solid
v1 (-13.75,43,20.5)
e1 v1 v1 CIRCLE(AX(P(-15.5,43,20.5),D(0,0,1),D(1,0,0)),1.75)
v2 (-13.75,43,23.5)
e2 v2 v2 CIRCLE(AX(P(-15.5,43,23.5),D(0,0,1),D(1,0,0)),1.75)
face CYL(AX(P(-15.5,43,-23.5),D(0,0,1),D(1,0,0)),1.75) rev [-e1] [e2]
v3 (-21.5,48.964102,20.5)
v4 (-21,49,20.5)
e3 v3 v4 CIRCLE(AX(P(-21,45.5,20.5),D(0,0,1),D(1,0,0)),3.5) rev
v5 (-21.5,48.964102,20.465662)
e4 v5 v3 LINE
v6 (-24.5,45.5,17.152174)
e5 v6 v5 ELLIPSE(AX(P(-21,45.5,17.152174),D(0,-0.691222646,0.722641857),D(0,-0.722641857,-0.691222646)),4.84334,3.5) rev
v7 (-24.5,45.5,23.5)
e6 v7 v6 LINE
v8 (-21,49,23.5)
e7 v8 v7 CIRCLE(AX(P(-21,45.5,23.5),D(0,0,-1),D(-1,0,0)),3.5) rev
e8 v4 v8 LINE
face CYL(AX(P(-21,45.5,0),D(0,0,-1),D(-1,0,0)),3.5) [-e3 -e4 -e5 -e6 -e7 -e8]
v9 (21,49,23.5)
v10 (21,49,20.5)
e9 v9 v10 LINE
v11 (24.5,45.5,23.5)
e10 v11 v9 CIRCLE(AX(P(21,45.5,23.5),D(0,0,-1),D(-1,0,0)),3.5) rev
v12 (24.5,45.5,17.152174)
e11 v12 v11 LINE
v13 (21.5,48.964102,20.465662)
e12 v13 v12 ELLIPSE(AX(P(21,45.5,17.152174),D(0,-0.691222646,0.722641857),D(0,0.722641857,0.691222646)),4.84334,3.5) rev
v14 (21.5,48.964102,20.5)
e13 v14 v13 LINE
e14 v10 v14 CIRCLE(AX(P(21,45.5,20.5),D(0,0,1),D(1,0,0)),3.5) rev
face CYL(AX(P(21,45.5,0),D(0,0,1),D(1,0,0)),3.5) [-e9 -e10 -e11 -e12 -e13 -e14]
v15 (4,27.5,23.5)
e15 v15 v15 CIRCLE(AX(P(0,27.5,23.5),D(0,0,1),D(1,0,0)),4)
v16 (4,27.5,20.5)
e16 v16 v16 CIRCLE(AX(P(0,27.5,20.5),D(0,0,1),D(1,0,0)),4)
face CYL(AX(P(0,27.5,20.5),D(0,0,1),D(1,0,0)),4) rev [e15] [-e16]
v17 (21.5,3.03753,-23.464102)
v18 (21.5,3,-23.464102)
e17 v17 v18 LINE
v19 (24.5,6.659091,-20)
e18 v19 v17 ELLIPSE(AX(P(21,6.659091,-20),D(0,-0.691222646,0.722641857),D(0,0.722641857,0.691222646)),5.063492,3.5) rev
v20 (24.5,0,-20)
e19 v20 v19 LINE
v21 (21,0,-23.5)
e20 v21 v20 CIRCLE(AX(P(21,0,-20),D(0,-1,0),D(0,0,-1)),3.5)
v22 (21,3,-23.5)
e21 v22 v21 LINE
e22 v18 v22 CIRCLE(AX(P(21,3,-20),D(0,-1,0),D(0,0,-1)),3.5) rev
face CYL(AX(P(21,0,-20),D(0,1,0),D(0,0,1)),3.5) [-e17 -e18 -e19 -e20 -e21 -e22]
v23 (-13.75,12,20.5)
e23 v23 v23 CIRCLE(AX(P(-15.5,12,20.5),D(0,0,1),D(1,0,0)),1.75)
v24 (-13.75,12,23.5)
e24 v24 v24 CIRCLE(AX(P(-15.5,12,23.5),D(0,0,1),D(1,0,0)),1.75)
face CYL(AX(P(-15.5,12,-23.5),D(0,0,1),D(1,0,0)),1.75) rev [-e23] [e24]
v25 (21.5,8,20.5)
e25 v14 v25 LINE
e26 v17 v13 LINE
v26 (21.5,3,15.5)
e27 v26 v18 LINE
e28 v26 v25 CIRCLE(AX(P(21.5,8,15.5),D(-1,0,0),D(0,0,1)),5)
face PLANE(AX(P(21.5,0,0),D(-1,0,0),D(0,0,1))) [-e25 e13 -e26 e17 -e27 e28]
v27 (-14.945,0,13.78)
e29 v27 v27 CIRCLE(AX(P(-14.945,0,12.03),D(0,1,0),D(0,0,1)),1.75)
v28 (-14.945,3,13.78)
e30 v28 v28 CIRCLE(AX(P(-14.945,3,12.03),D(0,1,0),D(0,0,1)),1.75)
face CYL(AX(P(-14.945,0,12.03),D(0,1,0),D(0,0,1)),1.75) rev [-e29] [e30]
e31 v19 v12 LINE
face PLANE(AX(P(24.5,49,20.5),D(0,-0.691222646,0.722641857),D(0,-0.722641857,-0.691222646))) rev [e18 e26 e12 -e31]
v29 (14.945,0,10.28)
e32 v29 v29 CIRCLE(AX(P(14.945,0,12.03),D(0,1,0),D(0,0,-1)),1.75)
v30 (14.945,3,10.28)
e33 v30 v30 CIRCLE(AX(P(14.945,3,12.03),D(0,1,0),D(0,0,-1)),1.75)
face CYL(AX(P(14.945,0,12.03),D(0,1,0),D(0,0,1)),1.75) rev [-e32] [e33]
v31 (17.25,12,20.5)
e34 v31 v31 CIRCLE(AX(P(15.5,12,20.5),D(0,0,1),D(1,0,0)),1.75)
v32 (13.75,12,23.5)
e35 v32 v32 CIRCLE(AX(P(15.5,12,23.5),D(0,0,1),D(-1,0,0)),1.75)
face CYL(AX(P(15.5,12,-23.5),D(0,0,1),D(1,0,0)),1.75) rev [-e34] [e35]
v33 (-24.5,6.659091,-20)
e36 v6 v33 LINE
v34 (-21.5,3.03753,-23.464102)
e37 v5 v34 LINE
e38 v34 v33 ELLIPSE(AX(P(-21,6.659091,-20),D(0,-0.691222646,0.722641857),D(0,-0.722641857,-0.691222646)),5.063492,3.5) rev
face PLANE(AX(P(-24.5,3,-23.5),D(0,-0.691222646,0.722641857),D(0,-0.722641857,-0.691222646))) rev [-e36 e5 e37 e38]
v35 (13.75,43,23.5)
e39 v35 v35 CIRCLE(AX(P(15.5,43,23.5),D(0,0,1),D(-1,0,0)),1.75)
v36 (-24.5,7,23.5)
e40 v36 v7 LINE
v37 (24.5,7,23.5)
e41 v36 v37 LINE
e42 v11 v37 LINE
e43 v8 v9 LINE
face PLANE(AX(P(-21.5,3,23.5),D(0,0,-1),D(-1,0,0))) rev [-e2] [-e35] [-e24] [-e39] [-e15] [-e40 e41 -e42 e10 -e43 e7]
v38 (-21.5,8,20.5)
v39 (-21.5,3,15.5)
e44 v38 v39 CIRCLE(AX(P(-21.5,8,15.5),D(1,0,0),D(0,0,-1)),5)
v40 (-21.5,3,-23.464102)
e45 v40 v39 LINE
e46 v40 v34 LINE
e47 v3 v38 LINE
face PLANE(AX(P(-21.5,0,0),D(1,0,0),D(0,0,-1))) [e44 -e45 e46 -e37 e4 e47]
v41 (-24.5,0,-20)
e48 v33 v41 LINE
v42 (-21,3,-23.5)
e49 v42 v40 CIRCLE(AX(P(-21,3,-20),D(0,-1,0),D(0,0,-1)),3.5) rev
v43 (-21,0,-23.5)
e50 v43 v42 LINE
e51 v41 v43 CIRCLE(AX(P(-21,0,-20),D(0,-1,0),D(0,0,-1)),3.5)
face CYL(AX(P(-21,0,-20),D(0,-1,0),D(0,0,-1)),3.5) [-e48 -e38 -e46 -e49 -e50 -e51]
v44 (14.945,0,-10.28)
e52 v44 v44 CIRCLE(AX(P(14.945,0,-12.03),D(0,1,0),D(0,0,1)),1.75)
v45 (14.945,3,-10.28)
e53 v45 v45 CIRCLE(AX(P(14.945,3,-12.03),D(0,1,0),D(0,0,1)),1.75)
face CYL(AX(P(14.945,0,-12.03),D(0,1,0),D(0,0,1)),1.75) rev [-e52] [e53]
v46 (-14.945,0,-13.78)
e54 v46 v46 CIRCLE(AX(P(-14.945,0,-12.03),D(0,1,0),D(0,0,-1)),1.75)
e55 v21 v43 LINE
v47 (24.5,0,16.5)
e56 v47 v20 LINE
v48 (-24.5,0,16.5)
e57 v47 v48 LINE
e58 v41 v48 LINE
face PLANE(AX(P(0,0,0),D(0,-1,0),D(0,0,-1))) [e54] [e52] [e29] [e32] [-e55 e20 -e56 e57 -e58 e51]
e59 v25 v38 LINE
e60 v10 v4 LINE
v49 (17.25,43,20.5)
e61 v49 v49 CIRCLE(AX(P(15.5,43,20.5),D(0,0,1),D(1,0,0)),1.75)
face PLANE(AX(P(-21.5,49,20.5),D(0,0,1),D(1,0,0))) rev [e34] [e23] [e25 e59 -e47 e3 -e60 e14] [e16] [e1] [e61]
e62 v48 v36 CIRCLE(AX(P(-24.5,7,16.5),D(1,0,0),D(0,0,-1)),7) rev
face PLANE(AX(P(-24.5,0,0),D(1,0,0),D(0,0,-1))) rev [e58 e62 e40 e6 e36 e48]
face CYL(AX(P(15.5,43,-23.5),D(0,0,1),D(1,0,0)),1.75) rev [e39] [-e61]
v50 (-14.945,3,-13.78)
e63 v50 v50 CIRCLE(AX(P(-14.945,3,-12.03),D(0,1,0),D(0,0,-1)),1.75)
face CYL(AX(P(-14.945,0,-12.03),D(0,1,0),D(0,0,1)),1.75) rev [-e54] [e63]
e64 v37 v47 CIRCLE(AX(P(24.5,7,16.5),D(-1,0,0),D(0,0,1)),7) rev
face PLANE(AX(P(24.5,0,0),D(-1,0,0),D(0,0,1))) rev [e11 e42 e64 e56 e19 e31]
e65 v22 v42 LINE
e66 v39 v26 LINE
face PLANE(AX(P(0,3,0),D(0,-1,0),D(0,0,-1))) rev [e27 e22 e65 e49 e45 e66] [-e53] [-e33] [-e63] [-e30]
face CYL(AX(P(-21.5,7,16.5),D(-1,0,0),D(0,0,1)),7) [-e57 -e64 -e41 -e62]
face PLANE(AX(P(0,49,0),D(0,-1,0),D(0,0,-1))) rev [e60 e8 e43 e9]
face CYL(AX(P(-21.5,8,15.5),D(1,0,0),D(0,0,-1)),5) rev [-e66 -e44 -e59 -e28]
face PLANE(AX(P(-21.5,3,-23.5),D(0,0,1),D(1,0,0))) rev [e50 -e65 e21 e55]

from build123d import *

# Parameters (mm, degrees)
ESBO_O1_W                = 43
ESBO_O1_H                = 47
RESSALTO_EXTRUS_O1_DEPTH = 3
ESBO_O2_W                = 43
ESBO_O2_H                = 3
RESSALTO_EXTRUS_O2_DEPTH = 46
ESBO_O3_R                = 1.75
CORTE_EXTRUS_O1_DEPTH    = 56.950871307
ESBO_O4_R                = 1.75
CORTE_EXTRUS_O2_DEPTH    = 72.219730412
RESSALTO_EXTRUS_O3_DEPTH = 3
RESSALTO_EXTRUS_O4_DEPTH = 3
ESBO_O7_R                = 4
CORTE_EXTRUS_O3_DEPTH    = 3
FILETE1_R                = 3.5
FILETE2_R                = 7
FILETE3_R                = 3.5
FILETE4_R                = 5


with BuildPart() as part:
    # Esboço1 → Ressalto-extrusão1 (new body)
    with BuildSketch(Plane(origin=(0, 0, 0), x_dir=(1, 0, 0), z_dir=(0, 1, 0))):
        Rectangle(ESBO_O1_W, ESBO_O1_H)
    extrude(amount=RESSALTO_EXTRUS_O1_DEPTH)

    # Esboço2 → Ressalto-extrusão2 (add)
    with BuildSketch(Plane(origin=(0, 3, 0), x_dir=(1, 0, 0), z_dir=(0, 1, 0))):
        with Locations((0, -22)):
            Rectangle(ESBO_O2_W, ESBO_O2_H)
    extrude(amount=RESSALTO_EXTRUS_O2_DEPTH)

    # Esboço3 → Corte-extrusão1 (cut, through all)
    with BuildSketch(Plane(origin=(0, 3, 0), x_dir=(1, 0, 0), z_dir=(0, 1, 0))):
        with Locations(Location((14.945, 12.03, 0), (0, 0, 270))):
            Circle(ESBO_O3_R)
        with Locations(Location((14.945, -12.03, 0), (0, 0, 90))):
            Circle(ESBO_O3_R)
        with Locations(Location((-14.945, -12.03, 0), (0, 0, 270))):
            Circle(ESBO_O3_R)
        with Locations(Location((-14.945, 12.03, 0), (0, 0, 90))):
            Circle(ESBO_O3_R)
    extrude(amount=-CORTE_EXTRUS_O1_DEPTH, mode=Mode.SUBTRACT)

    # Esboço4 → Corte-extrusão2 (cut, through all)
    with BuildSketch(Plane.XY.offset(23.5)):
        with Locations((-15.5, 43)):
            Circle(ESBO_O4_R)
        with Locations((15.5, 43)):
            Circle(ESBO_O4_R)
        with Locations((-15.5, 12)):
            Circle(ESBO_O4_R)
        with Locations((15.5, 12)):
            Circle(ESBO_O4_R)
    extrude(amount=-CORTE_EXTRUS_O2_DEPTH, mode=Mode.SUBTRACT)

    # Esboço5 → Ressalto-extrusão3 (add)
    with BuildSketch(Plane.ZY.offset(21.5)):
        Polygon((-23.5, 0), (-23.5, 3), (20.5, 49), (23.5, 49), (23.5, 0), align=None)
    extrude(amount=RESSALTO_EXTRUS_O3_DEPTH)

    # Esboço6 → Ressalto-extrusão4 (add)
    with BuildSketch(Plane(origin=(21.5, 0, 0), x_dir=(0, 0, -1), z_dir=(1, 0, 0))):
        Polygon((23.5, 0), (-23.5, 0), (-23.5, 49), (-20.5, 49), (23.5, 3), align=None)
    extrude(amount=RESSALTO_EXTRUS_O4_DEPTH)

    # Esboço7 → Corte-extrusão3 (cut)
    with BuildSketch(Plane.XY.offset(23.5)):
        with Locations((0, 27.5)):
            Circle(ESBO_O7_R)
    extrude(amount=-CORTE_EXTRUS_O3_DEPTH, mode=Mode.SUBTRACT)

    # Filete1
    # the kernel refuses this fillet: 3.5 mm, written as the material it takes off along each edge
    with BuildSketch(Plane(origin=(-24.5, 49, 11.75), x_dir=(1, 0, 0), z_dir=(0, 0, 1)), Plane(origin=(24.5, 49, 32.25), x_dir=(-1, 0, 0), z_dir=(0, 0, -1))) as filete1_piece_1:
        with BuildLine():
            CenterArc((FILETE1_R, -FILETE1_R), FILETE1_R, 90, 90)
            Line((0, -FILETE1_R), (0, 0))
            Line((0, 0), (FILETE1_R, 0))
        make_face()
    extrude(amount=20.5, mode=Mode.SUBTRACT)

    # Filete2
    filete2_edges = [part.edges().sort_by_distance(p)[0] for p in [
        (0, 0, 23.5),
    ]]
    fillet(filete2_edges, radius=FILETE2_R)

    # Filete3
    # the kernel refuses this fillet: 3.5 mm, written as the material it takes off along each edge
    with BuildSketch(Plane(origin=(-24.5, -8.75, -23.5), x_dir=(0, 0, 1), z_dir=(0, 1, 0)), Plane(origin=(24.5, 11.75, -23.5), x_dir=(0, 0, 1), z_dir=(0, -1, 0))) as filete3_piece_1:
        with BuildLine():
            CenterArc((FILETE3_R, FILETE3_R), FILETE3_R, 180, 90)
            Line((0, FILETE3_R), (0, 0))
            Line((0, 0), (FILETE3_R, 0))
        make_face()
    extrude(amount=20.5, mode=Mode.SUBTRACT)

    # Filete4
    filete4_edges = [part.edges().sort_by_distance(p)[0] for p in [
        (0, 3, 20.5),
    ]]
    fillet(filete4_edges, radius=FILETE4_R)


solid = part.part
